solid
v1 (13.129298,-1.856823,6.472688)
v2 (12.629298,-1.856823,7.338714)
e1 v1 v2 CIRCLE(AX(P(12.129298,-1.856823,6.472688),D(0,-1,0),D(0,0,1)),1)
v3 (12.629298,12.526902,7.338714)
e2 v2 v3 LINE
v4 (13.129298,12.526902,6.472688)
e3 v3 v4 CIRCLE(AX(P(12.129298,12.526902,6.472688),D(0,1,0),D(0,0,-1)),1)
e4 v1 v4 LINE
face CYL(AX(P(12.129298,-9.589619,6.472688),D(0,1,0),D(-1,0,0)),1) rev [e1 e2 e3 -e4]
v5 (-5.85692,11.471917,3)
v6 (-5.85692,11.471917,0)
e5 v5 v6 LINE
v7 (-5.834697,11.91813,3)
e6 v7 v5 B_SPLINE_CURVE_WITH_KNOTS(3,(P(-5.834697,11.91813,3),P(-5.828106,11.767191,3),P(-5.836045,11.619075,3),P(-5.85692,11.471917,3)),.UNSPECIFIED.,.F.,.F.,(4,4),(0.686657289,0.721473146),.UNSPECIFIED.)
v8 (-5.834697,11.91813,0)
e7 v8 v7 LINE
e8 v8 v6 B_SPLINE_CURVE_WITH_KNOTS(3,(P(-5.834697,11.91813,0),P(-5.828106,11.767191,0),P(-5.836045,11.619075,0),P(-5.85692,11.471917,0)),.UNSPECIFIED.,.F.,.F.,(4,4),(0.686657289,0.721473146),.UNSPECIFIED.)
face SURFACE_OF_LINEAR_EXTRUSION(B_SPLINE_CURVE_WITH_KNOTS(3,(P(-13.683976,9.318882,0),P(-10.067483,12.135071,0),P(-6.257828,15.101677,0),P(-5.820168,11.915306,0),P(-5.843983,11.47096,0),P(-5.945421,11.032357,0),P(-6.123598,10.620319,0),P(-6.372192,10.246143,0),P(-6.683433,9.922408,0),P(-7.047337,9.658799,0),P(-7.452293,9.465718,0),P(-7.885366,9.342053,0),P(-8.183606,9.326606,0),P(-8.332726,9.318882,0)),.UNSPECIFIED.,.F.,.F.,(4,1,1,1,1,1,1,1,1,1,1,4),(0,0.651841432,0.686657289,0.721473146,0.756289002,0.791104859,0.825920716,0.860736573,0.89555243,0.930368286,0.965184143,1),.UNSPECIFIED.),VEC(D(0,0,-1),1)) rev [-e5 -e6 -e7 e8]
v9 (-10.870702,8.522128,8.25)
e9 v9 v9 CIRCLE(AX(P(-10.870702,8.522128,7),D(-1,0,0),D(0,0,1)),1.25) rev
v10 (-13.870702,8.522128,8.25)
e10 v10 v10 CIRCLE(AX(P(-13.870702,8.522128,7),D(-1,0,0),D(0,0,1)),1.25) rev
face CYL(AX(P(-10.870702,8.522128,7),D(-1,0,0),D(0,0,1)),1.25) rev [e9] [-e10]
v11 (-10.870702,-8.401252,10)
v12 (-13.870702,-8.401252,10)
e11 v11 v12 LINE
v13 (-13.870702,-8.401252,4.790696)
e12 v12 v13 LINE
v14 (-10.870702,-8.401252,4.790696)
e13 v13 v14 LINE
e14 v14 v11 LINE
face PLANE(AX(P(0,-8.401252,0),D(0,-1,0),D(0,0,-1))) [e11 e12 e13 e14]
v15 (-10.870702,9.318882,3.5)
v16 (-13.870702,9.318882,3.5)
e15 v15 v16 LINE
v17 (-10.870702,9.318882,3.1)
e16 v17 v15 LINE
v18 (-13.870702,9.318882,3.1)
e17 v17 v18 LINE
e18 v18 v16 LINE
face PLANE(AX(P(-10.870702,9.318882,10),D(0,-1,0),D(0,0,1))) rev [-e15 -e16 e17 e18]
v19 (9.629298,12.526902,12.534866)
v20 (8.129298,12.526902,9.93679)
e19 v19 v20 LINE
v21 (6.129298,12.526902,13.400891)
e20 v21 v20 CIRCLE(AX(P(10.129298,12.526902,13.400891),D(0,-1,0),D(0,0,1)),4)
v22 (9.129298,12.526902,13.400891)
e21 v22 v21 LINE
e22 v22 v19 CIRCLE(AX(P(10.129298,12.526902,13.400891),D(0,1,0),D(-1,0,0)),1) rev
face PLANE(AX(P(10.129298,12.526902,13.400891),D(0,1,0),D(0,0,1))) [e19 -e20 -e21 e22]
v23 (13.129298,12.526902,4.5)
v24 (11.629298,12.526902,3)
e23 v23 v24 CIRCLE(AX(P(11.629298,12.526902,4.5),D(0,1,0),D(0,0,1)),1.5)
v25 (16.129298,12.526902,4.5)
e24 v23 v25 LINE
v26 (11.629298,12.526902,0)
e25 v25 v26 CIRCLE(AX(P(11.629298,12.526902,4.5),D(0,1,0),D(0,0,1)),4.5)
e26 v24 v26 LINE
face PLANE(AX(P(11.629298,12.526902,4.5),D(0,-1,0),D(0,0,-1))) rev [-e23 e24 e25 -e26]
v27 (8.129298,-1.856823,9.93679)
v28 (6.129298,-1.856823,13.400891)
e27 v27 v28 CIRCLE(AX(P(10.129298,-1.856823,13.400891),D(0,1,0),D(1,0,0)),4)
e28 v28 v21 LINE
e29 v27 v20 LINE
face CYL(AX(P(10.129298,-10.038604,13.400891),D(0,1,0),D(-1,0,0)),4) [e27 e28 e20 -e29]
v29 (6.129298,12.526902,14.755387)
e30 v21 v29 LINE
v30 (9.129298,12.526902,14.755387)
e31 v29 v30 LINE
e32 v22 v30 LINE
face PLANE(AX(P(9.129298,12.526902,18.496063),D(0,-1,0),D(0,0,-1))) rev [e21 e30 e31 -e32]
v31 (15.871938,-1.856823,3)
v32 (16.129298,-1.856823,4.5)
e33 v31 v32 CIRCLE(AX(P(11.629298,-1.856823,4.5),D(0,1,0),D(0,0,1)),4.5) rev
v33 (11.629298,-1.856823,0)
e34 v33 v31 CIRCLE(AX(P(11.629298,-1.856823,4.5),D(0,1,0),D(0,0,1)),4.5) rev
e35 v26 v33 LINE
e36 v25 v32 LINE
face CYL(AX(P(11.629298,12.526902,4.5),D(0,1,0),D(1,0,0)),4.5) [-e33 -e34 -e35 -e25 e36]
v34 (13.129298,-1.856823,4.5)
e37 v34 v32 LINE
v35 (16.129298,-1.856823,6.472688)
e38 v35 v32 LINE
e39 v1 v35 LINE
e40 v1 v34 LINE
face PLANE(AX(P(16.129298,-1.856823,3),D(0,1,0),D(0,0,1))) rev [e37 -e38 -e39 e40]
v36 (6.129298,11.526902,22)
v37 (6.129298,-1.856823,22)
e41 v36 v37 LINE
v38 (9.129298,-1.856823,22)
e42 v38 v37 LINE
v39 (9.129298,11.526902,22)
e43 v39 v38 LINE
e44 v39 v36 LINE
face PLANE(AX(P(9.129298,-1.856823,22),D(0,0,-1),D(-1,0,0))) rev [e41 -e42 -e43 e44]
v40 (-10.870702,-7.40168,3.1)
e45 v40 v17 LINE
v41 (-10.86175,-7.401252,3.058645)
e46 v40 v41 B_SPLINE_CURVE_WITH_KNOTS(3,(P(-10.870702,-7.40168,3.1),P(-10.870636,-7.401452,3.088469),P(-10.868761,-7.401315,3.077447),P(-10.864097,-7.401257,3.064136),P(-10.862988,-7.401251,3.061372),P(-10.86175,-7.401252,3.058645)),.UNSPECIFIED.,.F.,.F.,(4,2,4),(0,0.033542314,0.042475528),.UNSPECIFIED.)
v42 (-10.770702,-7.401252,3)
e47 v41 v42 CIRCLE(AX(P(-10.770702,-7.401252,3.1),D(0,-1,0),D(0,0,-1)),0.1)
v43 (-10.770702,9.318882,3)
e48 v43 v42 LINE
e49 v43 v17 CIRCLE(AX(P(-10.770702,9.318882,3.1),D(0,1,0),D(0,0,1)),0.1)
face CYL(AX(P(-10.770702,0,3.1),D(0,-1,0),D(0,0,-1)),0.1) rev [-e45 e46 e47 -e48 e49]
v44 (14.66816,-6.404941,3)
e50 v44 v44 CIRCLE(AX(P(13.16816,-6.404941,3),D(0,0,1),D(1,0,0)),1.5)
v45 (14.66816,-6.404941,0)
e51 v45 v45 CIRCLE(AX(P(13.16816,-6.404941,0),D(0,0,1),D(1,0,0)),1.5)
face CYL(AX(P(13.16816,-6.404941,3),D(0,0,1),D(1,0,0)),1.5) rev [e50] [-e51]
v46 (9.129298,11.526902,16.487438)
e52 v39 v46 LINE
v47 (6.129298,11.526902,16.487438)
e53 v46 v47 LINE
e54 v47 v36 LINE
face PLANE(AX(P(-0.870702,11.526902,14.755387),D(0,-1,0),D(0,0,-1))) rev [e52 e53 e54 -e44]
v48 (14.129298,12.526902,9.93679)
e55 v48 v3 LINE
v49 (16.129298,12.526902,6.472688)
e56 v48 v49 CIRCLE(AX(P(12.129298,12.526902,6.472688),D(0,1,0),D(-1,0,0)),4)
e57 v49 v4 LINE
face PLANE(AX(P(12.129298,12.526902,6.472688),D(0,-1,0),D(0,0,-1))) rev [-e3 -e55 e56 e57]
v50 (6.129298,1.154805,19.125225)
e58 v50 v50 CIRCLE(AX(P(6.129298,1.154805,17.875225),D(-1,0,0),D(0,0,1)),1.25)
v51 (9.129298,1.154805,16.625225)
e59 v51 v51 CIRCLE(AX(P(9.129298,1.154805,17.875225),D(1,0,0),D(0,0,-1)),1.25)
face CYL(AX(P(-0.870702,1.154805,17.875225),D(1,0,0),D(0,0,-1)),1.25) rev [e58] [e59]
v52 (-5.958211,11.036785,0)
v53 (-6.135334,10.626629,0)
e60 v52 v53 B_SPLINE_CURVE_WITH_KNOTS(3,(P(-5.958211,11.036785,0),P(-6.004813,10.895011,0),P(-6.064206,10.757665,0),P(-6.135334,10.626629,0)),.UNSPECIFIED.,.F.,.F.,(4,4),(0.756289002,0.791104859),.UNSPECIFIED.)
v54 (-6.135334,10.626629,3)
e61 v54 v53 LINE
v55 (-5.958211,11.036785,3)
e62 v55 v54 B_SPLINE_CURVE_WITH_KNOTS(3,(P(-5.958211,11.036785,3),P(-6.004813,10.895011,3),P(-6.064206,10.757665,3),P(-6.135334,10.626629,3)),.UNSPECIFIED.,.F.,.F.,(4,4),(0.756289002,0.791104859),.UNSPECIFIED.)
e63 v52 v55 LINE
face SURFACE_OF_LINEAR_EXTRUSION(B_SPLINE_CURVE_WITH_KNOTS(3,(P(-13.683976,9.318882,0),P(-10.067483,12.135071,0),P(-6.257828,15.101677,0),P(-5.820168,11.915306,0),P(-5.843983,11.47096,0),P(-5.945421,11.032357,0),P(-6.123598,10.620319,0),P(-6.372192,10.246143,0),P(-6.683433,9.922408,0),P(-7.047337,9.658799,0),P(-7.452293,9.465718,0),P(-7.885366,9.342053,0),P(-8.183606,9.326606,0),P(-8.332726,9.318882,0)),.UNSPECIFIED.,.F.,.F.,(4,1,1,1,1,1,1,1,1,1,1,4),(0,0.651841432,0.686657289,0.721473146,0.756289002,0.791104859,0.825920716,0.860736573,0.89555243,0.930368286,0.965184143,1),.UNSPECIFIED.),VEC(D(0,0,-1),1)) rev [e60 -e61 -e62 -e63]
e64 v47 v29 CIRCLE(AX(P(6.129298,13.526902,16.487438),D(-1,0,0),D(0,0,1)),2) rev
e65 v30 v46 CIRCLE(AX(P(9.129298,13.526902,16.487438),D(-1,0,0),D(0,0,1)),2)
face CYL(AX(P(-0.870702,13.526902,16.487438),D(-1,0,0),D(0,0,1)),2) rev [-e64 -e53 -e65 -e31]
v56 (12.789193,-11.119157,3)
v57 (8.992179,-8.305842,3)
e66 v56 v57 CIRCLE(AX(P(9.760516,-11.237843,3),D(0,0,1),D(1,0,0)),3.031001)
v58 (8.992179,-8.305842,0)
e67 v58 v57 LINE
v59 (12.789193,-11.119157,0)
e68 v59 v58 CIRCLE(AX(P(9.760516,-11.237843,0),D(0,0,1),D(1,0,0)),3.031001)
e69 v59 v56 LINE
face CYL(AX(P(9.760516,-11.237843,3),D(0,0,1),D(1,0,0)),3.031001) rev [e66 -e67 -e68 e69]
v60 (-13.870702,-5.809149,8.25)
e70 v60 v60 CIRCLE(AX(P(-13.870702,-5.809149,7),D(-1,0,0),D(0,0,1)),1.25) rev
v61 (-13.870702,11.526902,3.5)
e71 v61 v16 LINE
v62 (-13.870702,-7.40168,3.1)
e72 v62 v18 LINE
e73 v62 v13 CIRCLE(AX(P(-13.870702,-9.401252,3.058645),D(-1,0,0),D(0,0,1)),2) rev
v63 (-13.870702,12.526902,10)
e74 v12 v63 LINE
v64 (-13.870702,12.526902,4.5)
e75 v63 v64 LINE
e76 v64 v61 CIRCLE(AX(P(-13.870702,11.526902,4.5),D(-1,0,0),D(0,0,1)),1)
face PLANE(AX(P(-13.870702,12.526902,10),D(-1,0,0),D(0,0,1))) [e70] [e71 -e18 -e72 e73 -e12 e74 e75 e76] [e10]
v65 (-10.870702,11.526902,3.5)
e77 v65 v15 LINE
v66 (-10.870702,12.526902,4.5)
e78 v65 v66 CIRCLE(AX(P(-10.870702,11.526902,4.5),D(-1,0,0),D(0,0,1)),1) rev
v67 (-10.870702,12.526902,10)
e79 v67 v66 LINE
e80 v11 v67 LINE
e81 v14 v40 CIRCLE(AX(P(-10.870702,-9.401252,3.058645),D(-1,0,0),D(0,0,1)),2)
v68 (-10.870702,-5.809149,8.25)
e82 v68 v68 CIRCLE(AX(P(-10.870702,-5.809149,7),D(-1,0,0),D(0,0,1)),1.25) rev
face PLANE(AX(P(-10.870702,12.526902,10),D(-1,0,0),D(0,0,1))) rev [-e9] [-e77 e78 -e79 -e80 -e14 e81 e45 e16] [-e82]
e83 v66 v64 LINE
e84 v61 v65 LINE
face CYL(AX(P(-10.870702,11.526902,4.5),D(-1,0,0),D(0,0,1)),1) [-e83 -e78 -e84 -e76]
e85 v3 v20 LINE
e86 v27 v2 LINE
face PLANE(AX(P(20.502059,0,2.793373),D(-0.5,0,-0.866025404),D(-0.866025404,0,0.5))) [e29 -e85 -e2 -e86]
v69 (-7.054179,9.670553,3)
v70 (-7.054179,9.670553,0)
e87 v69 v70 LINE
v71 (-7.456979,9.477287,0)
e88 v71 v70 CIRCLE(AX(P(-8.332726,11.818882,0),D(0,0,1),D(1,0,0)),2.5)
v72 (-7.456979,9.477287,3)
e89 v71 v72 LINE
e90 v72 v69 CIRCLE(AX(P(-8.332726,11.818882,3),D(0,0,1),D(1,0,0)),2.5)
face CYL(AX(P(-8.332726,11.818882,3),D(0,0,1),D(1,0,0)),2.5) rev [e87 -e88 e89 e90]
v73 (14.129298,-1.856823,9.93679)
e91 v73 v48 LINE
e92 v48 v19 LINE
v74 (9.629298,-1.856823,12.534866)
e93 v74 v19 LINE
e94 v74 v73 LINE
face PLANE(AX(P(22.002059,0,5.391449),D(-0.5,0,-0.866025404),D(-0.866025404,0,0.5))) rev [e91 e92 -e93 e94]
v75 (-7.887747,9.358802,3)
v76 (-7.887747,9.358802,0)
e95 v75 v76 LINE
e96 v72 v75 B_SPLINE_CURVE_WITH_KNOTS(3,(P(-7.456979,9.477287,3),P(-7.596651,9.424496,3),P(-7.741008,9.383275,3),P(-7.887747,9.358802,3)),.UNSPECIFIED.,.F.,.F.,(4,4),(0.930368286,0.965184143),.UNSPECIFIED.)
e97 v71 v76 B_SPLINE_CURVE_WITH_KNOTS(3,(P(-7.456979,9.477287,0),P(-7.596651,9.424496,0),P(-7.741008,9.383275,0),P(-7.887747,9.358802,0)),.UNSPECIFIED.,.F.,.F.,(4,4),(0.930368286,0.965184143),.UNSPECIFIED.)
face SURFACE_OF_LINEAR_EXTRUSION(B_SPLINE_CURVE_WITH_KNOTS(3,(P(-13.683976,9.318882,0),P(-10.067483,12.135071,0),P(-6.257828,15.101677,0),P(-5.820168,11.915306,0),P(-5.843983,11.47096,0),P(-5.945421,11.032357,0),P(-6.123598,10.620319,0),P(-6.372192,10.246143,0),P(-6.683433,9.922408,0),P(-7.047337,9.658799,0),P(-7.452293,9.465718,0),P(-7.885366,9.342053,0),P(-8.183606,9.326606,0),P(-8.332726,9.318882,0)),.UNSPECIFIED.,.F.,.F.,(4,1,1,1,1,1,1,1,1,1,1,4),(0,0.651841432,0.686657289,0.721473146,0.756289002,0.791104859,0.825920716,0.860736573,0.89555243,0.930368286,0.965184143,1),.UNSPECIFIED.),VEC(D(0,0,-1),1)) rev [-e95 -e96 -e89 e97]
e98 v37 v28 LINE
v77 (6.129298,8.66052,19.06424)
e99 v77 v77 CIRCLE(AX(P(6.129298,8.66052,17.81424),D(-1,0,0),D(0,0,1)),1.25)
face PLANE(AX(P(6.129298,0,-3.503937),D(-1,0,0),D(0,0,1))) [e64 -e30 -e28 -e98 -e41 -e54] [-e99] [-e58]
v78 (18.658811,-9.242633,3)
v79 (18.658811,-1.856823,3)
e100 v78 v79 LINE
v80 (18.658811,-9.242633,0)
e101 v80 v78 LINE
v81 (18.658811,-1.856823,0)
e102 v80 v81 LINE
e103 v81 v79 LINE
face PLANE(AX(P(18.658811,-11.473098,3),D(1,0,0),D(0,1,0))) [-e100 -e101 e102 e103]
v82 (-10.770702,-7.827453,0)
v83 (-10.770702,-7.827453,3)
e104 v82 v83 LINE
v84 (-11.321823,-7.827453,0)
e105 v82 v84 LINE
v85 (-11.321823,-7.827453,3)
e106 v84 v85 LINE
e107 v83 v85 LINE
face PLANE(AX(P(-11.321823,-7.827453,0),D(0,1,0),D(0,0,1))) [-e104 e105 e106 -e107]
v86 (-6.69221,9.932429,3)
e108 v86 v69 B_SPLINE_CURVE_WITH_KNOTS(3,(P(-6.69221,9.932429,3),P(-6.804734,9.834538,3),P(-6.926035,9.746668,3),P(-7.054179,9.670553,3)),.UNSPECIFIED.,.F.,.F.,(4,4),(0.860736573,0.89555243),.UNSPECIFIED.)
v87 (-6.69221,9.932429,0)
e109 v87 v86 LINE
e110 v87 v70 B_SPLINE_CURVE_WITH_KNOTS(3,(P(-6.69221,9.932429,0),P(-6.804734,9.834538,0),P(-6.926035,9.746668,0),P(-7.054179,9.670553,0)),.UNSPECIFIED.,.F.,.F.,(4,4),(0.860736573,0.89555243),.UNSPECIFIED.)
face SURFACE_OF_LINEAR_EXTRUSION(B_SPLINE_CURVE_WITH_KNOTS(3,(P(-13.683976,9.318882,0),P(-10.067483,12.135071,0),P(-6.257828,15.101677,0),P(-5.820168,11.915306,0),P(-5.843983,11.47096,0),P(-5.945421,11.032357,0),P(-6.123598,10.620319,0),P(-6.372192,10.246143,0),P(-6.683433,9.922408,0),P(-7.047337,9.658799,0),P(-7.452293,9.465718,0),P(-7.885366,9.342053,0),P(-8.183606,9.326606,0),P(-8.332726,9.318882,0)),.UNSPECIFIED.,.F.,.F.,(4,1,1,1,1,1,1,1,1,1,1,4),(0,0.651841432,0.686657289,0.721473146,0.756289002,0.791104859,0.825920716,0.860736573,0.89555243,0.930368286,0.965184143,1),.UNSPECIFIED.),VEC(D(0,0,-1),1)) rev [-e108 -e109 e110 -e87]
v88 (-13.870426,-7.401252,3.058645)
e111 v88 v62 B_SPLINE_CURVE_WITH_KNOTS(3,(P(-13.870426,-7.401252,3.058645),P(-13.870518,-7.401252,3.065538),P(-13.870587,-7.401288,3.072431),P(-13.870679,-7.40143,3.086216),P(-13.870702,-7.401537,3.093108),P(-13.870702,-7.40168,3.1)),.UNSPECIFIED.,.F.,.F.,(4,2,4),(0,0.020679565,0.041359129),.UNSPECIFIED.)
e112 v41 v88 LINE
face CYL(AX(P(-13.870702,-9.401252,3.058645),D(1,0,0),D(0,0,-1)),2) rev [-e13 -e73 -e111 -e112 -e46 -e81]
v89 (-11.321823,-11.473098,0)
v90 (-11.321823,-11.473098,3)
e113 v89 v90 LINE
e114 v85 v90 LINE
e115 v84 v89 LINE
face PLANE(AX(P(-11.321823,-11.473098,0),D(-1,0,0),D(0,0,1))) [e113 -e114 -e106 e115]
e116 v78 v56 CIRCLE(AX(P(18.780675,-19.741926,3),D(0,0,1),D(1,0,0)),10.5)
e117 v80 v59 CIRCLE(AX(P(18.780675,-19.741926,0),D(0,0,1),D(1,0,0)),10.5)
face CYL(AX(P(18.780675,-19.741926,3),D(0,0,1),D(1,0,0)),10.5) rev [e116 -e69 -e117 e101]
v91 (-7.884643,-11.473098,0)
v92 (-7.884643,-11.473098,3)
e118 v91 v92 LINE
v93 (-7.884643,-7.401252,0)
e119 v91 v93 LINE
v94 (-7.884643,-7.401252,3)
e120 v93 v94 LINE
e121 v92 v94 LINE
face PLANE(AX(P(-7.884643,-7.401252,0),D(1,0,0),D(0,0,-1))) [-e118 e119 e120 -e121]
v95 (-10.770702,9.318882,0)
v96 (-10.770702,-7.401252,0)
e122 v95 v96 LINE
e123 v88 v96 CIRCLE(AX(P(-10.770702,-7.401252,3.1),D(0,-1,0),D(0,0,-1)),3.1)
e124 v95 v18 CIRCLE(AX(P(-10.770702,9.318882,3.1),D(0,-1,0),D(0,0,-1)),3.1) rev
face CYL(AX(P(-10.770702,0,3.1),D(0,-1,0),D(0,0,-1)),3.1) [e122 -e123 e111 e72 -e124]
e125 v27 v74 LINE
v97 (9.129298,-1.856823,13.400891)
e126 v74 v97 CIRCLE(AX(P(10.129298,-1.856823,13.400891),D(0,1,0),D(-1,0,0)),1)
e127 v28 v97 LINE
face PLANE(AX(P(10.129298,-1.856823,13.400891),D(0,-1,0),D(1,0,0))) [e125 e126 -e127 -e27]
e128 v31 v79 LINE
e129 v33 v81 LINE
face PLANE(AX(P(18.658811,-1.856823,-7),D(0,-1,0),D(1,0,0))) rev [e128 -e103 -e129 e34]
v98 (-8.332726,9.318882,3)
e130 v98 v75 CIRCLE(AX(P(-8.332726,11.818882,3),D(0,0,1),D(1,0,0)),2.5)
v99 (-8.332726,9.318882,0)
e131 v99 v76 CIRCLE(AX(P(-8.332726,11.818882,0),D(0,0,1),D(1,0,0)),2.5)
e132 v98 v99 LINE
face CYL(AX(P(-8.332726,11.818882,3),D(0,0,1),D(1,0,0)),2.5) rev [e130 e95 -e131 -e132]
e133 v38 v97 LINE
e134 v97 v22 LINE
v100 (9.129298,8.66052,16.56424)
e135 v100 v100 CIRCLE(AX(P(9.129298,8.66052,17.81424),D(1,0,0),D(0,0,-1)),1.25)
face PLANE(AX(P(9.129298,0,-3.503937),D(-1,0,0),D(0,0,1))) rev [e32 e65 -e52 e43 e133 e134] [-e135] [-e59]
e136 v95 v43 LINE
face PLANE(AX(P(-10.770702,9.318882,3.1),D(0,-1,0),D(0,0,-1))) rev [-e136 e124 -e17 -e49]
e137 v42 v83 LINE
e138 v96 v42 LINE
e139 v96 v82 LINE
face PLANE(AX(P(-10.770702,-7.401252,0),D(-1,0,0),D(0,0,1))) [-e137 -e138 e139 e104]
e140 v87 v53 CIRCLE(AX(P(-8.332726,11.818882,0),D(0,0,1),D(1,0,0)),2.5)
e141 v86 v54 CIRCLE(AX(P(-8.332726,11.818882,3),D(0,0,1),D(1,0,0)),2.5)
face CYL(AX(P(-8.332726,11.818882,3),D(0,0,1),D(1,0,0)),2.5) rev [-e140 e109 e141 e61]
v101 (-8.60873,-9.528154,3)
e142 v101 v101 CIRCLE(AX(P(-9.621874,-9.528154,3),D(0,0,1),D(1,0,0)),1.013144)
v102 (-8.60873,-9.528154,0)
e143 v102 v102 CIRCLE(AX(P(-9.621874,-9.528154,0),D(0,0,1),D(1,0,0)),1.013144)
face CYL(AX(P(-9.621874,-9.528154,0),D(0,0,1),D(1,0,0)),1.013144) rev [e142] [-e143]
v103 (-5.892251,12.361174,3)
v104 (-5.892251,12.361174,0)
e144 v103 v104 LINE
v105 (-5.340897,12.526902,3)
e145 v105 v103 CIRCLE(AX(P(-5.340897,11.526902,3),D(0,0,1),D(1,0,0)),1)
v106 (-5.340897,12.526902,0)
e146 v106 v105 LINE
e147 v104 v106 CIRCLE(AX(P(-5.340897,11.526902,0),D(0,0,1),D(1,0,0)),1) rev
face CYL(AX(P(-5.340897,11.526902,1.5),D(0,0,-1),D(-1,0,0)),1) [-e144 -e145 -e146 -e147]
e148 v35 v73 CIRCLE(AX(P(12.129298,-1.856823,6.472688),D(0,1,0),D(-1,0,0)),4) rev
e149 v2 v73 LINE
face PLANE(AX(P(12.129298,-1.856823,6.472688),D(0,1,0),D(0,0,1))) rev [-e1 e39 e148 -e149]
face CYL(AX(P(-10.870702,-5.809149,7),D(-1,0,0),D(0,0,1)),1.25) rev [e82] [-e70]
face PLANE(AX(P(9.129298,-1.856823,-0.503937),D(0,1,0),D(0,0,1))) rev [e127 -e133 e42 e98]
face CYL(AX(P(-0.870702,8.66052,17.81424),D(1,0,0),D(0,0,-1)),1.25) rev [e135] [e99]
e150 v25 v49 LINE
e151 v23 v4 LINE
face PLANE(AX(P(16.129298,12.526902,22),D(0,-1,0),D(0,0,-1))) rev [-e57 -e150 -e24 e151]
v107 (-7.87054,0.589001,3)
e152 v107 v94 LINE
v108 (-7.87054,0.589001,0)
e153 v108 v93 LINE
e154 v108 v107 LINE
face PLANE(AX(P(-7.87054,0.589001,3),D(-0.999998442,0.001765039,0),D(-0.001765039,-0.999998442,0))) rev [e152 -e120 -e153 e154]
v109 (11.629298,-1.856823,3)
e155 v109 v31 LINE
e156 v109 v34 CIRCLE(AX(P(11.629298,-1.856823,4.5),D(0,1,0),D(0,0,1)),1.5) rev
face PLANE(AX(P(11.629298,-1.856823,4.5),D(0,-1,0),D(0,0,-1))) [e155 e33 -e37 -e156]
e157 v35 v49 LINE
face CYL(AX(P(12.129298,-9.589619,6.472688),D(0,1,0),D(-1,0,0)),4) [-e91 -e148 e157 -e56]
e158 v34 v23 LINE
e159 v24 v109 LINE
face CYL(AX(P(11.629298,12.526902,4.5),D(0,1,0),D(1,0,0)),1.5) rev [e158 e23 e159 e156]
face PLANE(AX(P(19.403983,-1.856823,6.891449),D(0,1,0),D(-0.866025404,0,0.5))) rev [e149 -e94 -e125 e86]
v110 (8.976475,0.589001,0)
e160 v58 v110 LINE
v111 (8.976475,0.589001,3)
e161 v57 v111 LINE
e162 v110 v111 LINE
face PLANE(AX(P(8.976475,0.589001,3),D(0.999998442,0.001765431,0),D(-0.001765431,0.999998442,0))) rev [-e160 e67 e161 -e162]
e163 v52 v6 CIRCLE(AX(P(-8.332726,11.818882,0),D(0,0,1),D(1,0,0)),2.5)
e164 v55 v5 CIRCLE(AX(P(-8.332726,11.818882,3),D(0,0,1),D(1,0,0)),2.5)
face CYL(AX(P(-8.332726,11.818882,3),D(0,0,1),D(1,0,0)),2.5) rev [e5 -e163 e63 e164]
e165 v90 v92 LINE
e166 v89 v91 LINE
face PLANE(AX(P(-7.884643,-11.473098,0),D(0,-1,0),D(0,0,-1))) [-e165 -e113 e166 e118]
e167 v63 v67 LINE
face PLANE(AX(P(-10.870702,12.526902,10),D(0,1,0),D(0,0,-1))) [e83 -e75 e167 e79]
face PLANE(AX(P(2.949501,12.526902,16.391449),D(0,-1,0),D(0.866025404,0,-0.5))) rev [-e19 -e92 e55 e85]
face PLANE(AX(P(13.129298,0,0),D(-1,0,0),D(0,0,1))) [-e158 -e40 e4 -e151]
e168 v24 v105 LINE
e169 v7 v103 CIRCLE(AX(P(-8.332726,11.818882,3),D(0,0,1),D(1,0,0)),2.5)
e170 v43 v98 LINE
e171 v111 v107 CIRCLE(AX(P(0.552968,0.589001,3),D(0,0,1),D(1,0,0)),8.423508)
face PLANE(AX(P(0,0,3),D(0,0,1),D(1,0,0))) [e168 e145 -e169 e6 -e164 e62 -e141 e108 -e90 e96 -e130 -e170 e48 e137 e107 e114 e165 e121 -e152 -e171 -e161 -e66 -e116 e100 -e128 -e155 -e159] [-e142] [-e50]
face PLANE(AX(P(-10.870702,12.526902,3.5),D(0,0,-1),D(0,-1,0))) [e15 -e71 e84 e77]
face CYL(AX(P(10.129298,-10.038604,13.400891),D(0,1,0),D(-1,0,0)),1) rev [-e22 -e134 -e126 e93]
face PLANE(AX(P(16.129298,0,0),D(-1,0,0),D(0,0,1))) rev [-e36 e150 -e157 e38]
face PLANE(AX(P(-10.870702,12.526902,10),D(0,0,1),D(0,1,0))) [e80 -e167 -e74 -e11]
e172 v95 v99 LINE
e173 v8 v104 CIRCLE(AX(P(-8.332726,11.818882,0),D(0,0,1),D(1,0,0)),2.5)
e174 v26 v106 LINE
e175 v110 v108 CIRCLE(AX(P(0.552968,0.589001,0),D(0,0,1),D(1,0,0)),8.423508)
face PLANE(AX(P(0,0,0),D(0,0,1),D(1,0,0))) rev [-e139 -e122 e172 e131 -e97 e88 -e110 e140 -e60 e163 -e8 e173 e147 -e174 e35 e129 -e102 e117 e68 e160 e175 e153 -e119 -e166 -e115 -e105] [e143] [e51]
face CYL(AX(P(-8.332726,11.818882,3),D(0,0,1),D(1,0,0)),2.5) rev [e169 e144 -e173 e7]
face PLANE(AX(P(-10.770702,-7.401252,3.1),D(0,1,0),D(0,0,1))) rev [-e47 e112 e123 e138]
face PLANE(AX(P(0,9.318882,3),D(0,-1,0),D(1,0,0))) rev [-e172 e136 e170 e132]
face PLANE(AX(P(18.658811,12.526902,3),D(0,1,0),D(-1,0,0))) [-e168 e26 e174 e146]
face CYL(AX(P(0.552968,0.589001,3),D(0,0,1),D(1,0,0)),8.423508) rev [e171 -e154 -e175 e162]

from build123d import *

# Parameters (mm, degrees)
SKETCH1_W                    = 30.529513274
SKETCH1_H                    = 24
BOSS_EXTRUDE1_DEPTH          = 3
SKETCH2_R                    = 1.5
CUT_EXTRUDE1_DEPTH           = 10
SKETCH6_R                    = 3.031001388
SKETCH6_R_2                  = 1.013144299
CUT_EXTRUDE3_DEPTH           = 10
SKETCH4_W                    = 2
SKETCH4_H                    = 19.928154349
BOSS_EXTRUDE2_DEPTH          = 10
SKETCH5_R                    = 1.25
CUT_EXTRUDE2_DEPTH           = 36.369951754
SKETCH31_W                   = 7.266440603
SKETCH31_H                   = 7.840373691
CUT_EXTRUDE6_DEPTH           = 10
CONVERT_SOLID1_START         = -13.578124278
CONVERT_SOLID1_OUTLINE_W     = 19.928154349
CONVERT_SOLID1_OUTLINE_H     = 7
CONVERT_SOLID1_OUTLINE_R     = 1.25
CONVERT_SOLID1_DEPTH         = 0.707422
CONVERT_SOLID1_START_2       = -13.870702278
CONVERT_SOLID1_2_OUTLINE_W   = 19.928154349
CONVERT_SOLID1_2_OUTLINE_H   = 10
CONVERT_SOLID1_2_OUTLINE_R   = 1.25
CONVERT_SOLID1_2_DEPTH       = 1
CONVERT_SOLID1_START_3       = -12.304269382
CONVERT_SOLID1_3_OUTLINE_W   = 19.928154349
CONVERT_SOLID1_3_OUTLINE_H   = 7
CONVERT_SOLID1_3_OUTLINE_R   = 1.25
CONVERT_SOLID1_3_DEPTH       = 1.533567104
CONVERT_SOLID1_START_4       = -7.401252108
CONVERT_SOLID1_4_DEPTH       = 19.928154349
SKETCH24_W                   = 5.529513274
SKETCH24_H                   = 14.38372484
CUT_EXTRUDE4_DEPTH           = 10
EDGE_FLANGE4_STRIP_W         = 15
EDGE_FLANGE4_STRIP_H         = 3
EDGE_FLANGE4_STRIP_CUT_DEPTH = 14.38372484
EDGE_FLANGE4_DEPTH           = 14.38372484
JOG1_START                   = -1.856822599
JOG1_DEPTH                   = 14.38372484
JOG1_2_DEPTH                 = 14.38372484
SKETCH30_R                   = 1.25
CUT_EXTRUDE5_DEPTH           = 10
SKETCH32_R                   = 1.013144299
BOSS_EXTRUDE3_DEPTH          = 3
SKETCH33_W                   = 7.665012493
SKETCH33_H                   = 1
CUT_EXTRUDE7_DEPTH           = 10
FILLET1_R                    = 2
SKETCH34_W                   = 3
SKETCH34_H                   = 5.209304408
BOSS_EXTRUDE4_DEPTH          = 1
FILLET2_START                = -13.870702278
FILLET2_DEPTH                = 3
CUT_EXTRUDE8_START           = -3.5
CUT_EXTRUDE8_DEPTH           = 3.5
FILLET3_R                    = 1


with BuildPart() as part:
    # Sketch1 → Boss-Extrude1 (new body)
    with BuildSketch(Plane.XY):
        with Locations((3.394054359, 0.526902241)):
            Rectangle(SKETCH1_W, SKETCH1_H)
    extrude(amount=BOSS_EXTRUDE1_DEPTH)

    # Sketch2 → Cut-Extrude1 (cut)
    with BuildSketch(Plane.XY.offset(3)):
        with Locations((13.168159701, -6.404941255)):
            Circle(SKETCH2_R)
        with BuildLine():
            Line((8.976475461, 0.589001072), (9.005600067, -15.908139628))
            ThreePointArc((9.005600067, -15.908139628), (29.280658421, -19.723388497), (9.019197546, -23.610201897))
            Line((9.019197546, -23.610201897), (9.019729255, -23.911379441))
            ThreePointArc((9.019729255, -23.911379441), (0.556548127, -32.385304577), (-7.913797188, -23.918540598))
            Line((-7.913797188, -23.918540598), (-7.870540366, 0.589001072))
            ThreePointArc((-7.870540366, 0.589001072), (0.552967548, 9.012508985), (8.976475461, 0.589001072))
        make_face()
    extrude(amount=-CUT_EXTRUDE1_DEPTH, mode=Mode.SUBTRACT)

    # Sketch6 → Cut-Extrude3 (cut)
    with BuildSketch(Plane.XY.offset(3)):
        with Locations((9.76051578, -11.237842953)):
            Circle(SKETCH6_R)
        with Locations((-9.621874041, -9.528153609)):
            Circle(SKETCH6_R_2)
    extrude(amount=-CUT_EXTRUDE3_DEPTH, mode=Mode.SUBTRACT)

    # Sketch4 → Boss-Extrude2 (add)
    with BuildSketch(Plane.XY):
        with Locations((-11.870702278, 2.562825066)):
            Rectangle(SKETCH4_W, SKETCH4_H)
    extrude(amount=BOSS_EXTRUDE2_DEPTH)

    # Sketch5 → Cut-Extrude2 (cut, through all)
    with BuildSketch(Plane(origin=(-12.870702278, 0, 0), x_dir=(0, 0, -1), z_dir=(1, 0, 0))):
        with Locations(Location((-7, 8.522127831, 0), (0, 0, 180))):
            Circle(SKETCH5_R)
        with Locations(Location((-7, -5.809148927, 0), (0, 0, 180))):
            Circle(SKETCH5_R)
    extrude(amount=CUT_EXTRUDE2_DEPTH, mode=Mode.SUBTRACT)

    # Sketch31 → Cut-Extrude6 (cut)
    with BuildSketch(Plane.XY.offset(3)):
        with Locations((-8.237481976, -11.321438954)):
            Rectangle(SKETCH31_W, SKETCH31_H)
    extrude(amount=-CUT_EXTRUDE6_DEPTH, mode=Mode.SUBTRACT)

    # Convert-Solid1: read off the stored shape, not the designer's step
    # Convert-Solid1 outline → Convert-Solid1 (add)
    with BuildSketch(Plane.YZ.offset(CONVERT_SOLID1_START)):
        with Locations((2.562825066, 6.5)):
            Rectangle(CONVERT_SOLID1_OUTLINE_W, CONVERT_SOLID1_OUTLINE_H)
        with Locations((-5.809148927, 7)):
            Circle(CONVERT_SOLID1_OUTLINE_R, mode=Mode.SUBTRACT)
        with Locations((8.522127831, 7)):
            Circle(CONVERT_SOLID1_OUTLINE_R, mode=Mode.SUBTRACT)
    extrude(amount=CONVERT_SOLID1_DEPTH)

    # Convert-Solid1 2 outline → Convert-Solid1 2 (add)
    with BuildSketch(Plane.YZ.offset(CONVERT_SOLID1_START_2)):
        with Locations((2.562825066, 5)):
            Rectangle(CONVERT_SOLID1_2_OUTLINE_W, CONVERT_SOLID1_2_OUTLINE_H)
        with Locations((8.522127831, 7)):
            Circle(CONVERT_SOLID1_2_OUTLINE_R, mode=Mode.SUBTRACT)
        with Locations((-5.809148927, 7)):
            Circle(CONVERT_SOLID1_2_OUTLINE_R, mode=Mode.SUBTRACT)
    extrude(amount=CONVERT_SOLID1_2_DEPTH)

    # Convert-Solid1 3 outline → Convert-Solid1 3 (add)
    with BuildSketch(Plane.YZ.offset(CONVERT_SOLID1_START_3)):
        with Locations((2.562825066, 6.5)):
            Rectangle(CONVERT_SOLID1_3_OUTLINE_W, CONVERT_SOLID1_3_OUTLINE_H)
        with Locations((-5.809148927, 7)):
            Circle(CONVERT_SOLID1_3_OUTLINE_R, mode=Mode.SUBTRACT)
        with Locations((8.522127831, 7)):
            Circle(CONVERT_SOLID1_3_OUTLINE_R, mode=Mode.SUBTRACT)
    extrude(amount=CONVERT_SOLID1_3_DEPTH)

    # Convert-Solid1 4 outline → Convert-Solid1 4 (cut)
    with BuildSketch(Plane(origin=(0, 0, 0), x_dir=(1, 0, 0), z_dir=(0, 1, 0)).offset(CONVERT_SOLID1_START_4)):
        with BuildLine():
            ThreePointArc((-10.770702278, -3), (-10.841412956, -3.029289322), (-10.870702278, -3.1))
            Line((-10.870702278, -3.1), (-10.870702278, -10))
            Line((-10.870702278, -10), (-10.770702278, -10))
            Line((-10.770702278, -10), (-10.770702278, -3))
        make_face()
        with BuildLine():
            Line((-13.870702278, 0), (-13.870702278, -3.1))
            ThreePointArc((-13.870702278, -3.1), (-12.9627333, -0.907968978), (-10.770702278, 0))
            Line((-10.770702278, 0), (-13.870702278, 0))
        make_face()
    extrude(amount=CONVERT_SOLID1_4_DEPTH, mode=Mode.SUBTRACT)

    # Sketch24 → Cut-Extrude4 (cut)
    with BuildSketch(Plane.XY.offset(3)):
        with Locations((15.894054359, 5.335039821)):
            Rectangle(SKETCH24_W, SKETCH24_H)
    extrude(amount=-CUT_EXTRUDE4_DEPTH, mode=Mode.SUBTRACT)

    # Edge-Flange4: sheet metal written as solids
    # Edge-Flange4 strip (on a plane across the edge) → Edge-Flange4 strip cut (cut)
    with BuildSketch(Plane(origin=(13.129297722, -1.856822599, 3), x_dir=(-1, 0, 0), z_dir=(0, 1, 0))):
        with Locations((-6, -1.5)):
            Rectangle(EDGE_FLANGE4_STRIP_W, EDGE_FLANGE4_STRIP_H)
    extrude(amount=EDGE_FLANGE4_STRIP_CUT_DEPTH, mode=Mode.SUBTRACT)

    # Edge-Flange4 section (on a plane across the edge) → Edge-Flange4 (add)
    with BuildSketch(Plane(origin=(13.129297722, -1.856822599, 3), x_dir=(-1, 0, 0), z_dir=(0, 1, 0))):
        with BuildLine():
            Line((-3, 1.5), (-3, 19))
            Line((-3, 19), (0, 19))
            Line((0, 19), (0, 1.5))
            ThreePointArc((0, 1.5), (0.439339828, 0.439339828), (1.5, 0))
            Line((1.5, 0), (1.5, -3))
            ThreePointArc((1.5, -3), (-1.681980515, -1.681980515), (-3, 1.5))
        make_face()
    extrude(amount=EDGE_FLANGE4_DEPTH)

    # Jog1: read off the stored shape, not the designer's step
    # Jog1 outline → Jog1 (cut)
    with BuildSketch(Plane(origin=(0, 0, 0), x_dir=(1, 0, 0), z_dir=(0, 1, 0)).offset(JOG1_START)):
        with BuildLine():
            Line((14.129297722, -9.936789869), (13.129297722, -10.514140138))
            Line((13.129297722, -10.514140138), (13.129297722, -22))
            Line((13.129297722, -22), (16.129297722, -22))
            Line((16.129297722, -22), (16.129297722, -6.472688254))
            ThreePointArc((16.129297722, -6.472688254), (15.593399337, -8.472688254), (14.129297722, -9.936789869))
        make_face()
    extrude(amount=JOG1_DEPTH, mode=Mode.SUBTRACT)

    # Jog1 2 outline → Jog1 2 (add)
    with BuildSketch(Plane(origin=(0, 0, 0), x_dir=(1, 0, 0), z_dir=(0, 1, 0)).offset(JOG1_START)):
        with BuildLine():
            ThreePointArc((13.129297722, -6.472688254), (12.995323126, -6.972688254), (12.629297722, -7.338713658))
            Line((12.629297722, -7.338713658), (8.129297722, -9.936789869))
            ThreePointArc((8.129297722, -9.936789869), (6.665196107, -11.400891484), (6.129297722, -13.400891484))
            Line((6.129297722, -13.400891484), (6.129297722, -22))
            Line((6.129297722, -22), (9.129297722, -22))
            Line((9.129297722, -22), (9.129297722, -13.400891484))
            ThreePointArc((9.129297722, -13.400891484), (9.263272318, -12.900891484), (9.629297722, -12.534866081))
            Line((9.629297722, -12.534866081), (13.129297722, -10.514140138))
            Line((13.129297722, -10.514140138), (13.129297722, -6.472688254))
        make_face()
    extrude(amount=JOG1_2_DEPTH)

    # Sketch30 → Cut-Extrude5 (cut)
    with BuildSketch(Plane(origin=(9.129297722, 0, 0), x_dir=(0, 0, -1), z_dir=(1, 0, 0))):
        with Locations((-17.875225206, 1.154804866)):
            Circle(SKETCH30_R)
        with Locations((-17.814240258, 8.660520186)):
            Circle(SKETCH30_R)
    extrude(amount=-CUT_EXTRUDE5_DEPTH, mode=Mode.SUBTRACT)

    # Sketch32 → Boss-Extrude3 (add)
    with BuildSketch(Plane.XY.offset(3)):
        Polygon((-7.884643492, -7.401252108), (-10.770702278, -7.401252108), (-10.770702278, -7.827453032), (-11.321822858, -7.827453032), (-11.321822858, -11.473097759), (-10.770702278, -11.473097759), (-7.884643492, -11.473097759), align=None)
        with Locations((-9.621874041, -9.528153609)):
            Circle(SKETCH32_R, mode=Mode.SUBTRACT)
    extrude(amount=-BOSS_EXTRUDE3_DEPTH)

    # Sketch33 → Cut-Extrude7 (cut)
    with BuildSketch(Plane(origin=(9.129297722, 0, 0), x_dir=(0, 0, -1), z_dir=(1, 0, 0))):
        with Locations((-18.587893568, 12.026902241)):
            Rectangle(SKETCH33_W, SKETCH33_H)
    extrude(amount=-CUT_EXTRUDE7_DEPTH, mode=Mode.SUBTRACT)

    # Fillet1
    # the kernel refuses this fillet: 2 mm, written as the material it adds along each edge
    with BuildSketch(Plane(origin=(9.129297722, 11.526902241, 14.755387321), x_dir=(0, 1, 0), z_dir=(-1, 0, 0))) as fillet1_piece_1:
        with BuildLine():
            CenterArc((2, -1.732050808), FILLET1_R, 120, 60)
            Line((0, -1.732050808), (-0.04, -1.732050808))
            Line((-0.04, -1.732050808), (-0.04, 0))
            Line((-0.04, 0), (0, 0.04))
            ThreePointArc((0, 0.04), (0.5, 0.04), (0.98, 0.034641016))
            Line((0.98, 0.034641016), (1, 0))
        make_face()
    extrude(amount=3)

    # Sketch34 → Boss-Extrude4 (add)
    with BuildSketch(Plane(origin=(0, -7.401252108, 0), x_dir=(-1, 0, 0), z_dir=(0, -1, 0))):
        with Locations((12.370702278, -7.395347796)):
            Rectangle(SKETCH34_W, SKETCH34_H)
    extrude(amount=BOSS_EXTRUDE4_DEPTH)

    # Fillet2: read off the stored shape, not the designer's step
    # Fillet2 outline → Fillet2 (add)
    with BuildSketch(Plane.YZ.offset(FILLET2_START)):
        with BuildLine():
            ThreePointArc((-8.401252108, 4.790695592), (-7.669201301, 4.058644784), (-7.401252108, 3.058644784))
            Line((-7.401252108, 3.058644784), (-7.401252108, 4.790695592))
            Line((-7.401252108, 4.790695592), (-8.401252108, 4.790695592))
        make_face()
    extrude(amount=FILLET2_DEPTH)

    # Cut-Extrude8: read off the stored shape, not the designer's step
    # Cut-Extrude8 outline → Cut-Extrude8 (cut)
    with BuildSketch(Plane(origin=(0, 0, 0), x_dir=(-1, 0, 0), z_dir=(0, 0, -1)).offset(CUT_EXTRUDE8_START)):
        with BuildLine():
            add(Edge.make_bspline(
                [(5.934293569, 12.526902242), (5.918772793, 12.474323244), (5.904747253, 12.419100587), (5.892251154, 12.361173794)],
                knots=[0.637263122, 0.637263122, 0.637263122, 0.637263122, 0.651841432, 0.651841432, 0.651841432, 0.651841432], degree=3))
            ThreePointArc((5.892251154, 12.361173794), (5.853557529, 12.140940274), (5.834697256, 11.918130287))
            add(Edge.make_bspline(
                [(5.834697256, 11.918130287), (5.828106476, 11.7671908), (5.836044906, 11.619075327), (5.856920418, 11.471917187)],
                knots=[0.686657289, 0.686657289, 0.686657289, 0.686657289, 0.721473146, 0.721473146, 0.721473146, 0.721473146], degree=3))
            ThreePointArc((5.856920418, 11.471917187), (5.897826068, 11.252083778), (5.958210921, 11.036784754))
            add(Edge.make_bspline(
                [(5.958210921, 11.036784754), (6.004813319, 10.89501127), (6.064205524, 10.757665111), (6.135333951, 10.626629378)],
                knots=[0.756289002, 0.756289002, 0.756289002, 0.756289002, 0.791104859, 0.791104859, 0.791104859, 0.791104859], degree=3))
            ThreePointArc((6.135333951, 10.626629378), (6.382632907, 10.254549782), (6.69221005, 9.9324287))
            add(Edge.make_bspline(
                [(6.69221005, 9.9324287), (6.804734203, 9.834537986), (6.9260354, 9.746668372), (7.054178725, 9.670553388)],
                knots=[0.860736573, 0.860736573, 0.860736573, 0.860736573, 0.89555243, 0.89555243, 0.89555243, 0.89555243], degree=3))
            ThreePointArc((7.054178725, 9.670553388), (7.251253019, 9.564904332), (7.4569791, 9.477287098))
            add(Edge.make_bspline(
                [(7.4569791, 9.477287098), (7.596650694, 9.424496148), (7.741008428, 9.383274602), (7.887747341, 9.358801983)],
                knots=[0.930368286, 0.930368286, 0.930368286, 0.930368286, 0.965184143, 0.965184143, 0.965184143, 0.965184143], degree=3))
            ThreePointArc((7.887747341, 9.358801983), (8.109343355, 9.328881983), (8.332726434, 9.318881983))
            Line((8.332726434, 9.318881983), (13.870702278, 9.318881983))
            Line((13.870702278, 9.318881983), (13.870702278, 12.526902241))
            Line((13.870702278, 12.526902241), (5.934293569, 12.526902242))
        make_face()
    extrude(amount=CUT_EXTRUDE8_DEPTH, mode=Mode.SUBTRACT)

    # Fillet3
    # the kernel refuses this fillet: 1 mm, written as the material it takes off along each edge
    with BuildSketch(Plane(origin=(-5.934293569, 12.526902242, 4.483490455), x_dir=(1.0, -1.2849512844453004e-09, 0), z_dir=(0, 0, -1))) as fillet3_piece_1:
        with BuildLine():
            CenterArc((0.593396183, 1), FILLET3_R, 236.540063236, 33.45993669)
            Line((0.042042415, 0.165728448), (0.03101534, 0.149043017))
            ThreePointArc((0.03101534, 0.149043017), (0.003175491, 0.087378927), (-0.019181734, 0.00566225))
            Line((-0.019181734, 0.00566225), (0, -0.02))
            Line((0, -0.02), (0.593396182, -0.02))
            Line((0.593396182, -0.02), (0.593396182, 0))
        make_face()
    extrude(amount=5.966980909, mode=Mode.SUBTRACT)
    with BuildSketch(Plane(origin=(-16.370702278, 12.526902241, 3.5), x_dir=(1.2600158578102924e-10, -1.0, 0), z_dir=(1.0, 1.2600158578102924e-10, 0))) as fillet3_piece_2:
        with BuildLine():
            CenterArc((FILLET3_R, -FILLET3_R), FILLET3_R, 90, 90)
            Line((0, -FILLET3_R), (-FILLET3_R * 0.0200000000485, -FILLET3_R))
            Line((-FILLET3_R * 0.0200000000485, -FILLET3_R), (-FILLET3_R * 0.02, FILLET3_R * 0.02))
            Line((-FILLET3_R * 0.02, FILLET3_R * 0.02), (FILLET3_R, FILLET3_R * 0.02))
            Line((FILLET3_R, FILLET3_R * 0.02), (FILLET3_R, 0))
        make_face()
    extrude(amount=8, mode=Mode.SUBTRACT)


solid = part.part
